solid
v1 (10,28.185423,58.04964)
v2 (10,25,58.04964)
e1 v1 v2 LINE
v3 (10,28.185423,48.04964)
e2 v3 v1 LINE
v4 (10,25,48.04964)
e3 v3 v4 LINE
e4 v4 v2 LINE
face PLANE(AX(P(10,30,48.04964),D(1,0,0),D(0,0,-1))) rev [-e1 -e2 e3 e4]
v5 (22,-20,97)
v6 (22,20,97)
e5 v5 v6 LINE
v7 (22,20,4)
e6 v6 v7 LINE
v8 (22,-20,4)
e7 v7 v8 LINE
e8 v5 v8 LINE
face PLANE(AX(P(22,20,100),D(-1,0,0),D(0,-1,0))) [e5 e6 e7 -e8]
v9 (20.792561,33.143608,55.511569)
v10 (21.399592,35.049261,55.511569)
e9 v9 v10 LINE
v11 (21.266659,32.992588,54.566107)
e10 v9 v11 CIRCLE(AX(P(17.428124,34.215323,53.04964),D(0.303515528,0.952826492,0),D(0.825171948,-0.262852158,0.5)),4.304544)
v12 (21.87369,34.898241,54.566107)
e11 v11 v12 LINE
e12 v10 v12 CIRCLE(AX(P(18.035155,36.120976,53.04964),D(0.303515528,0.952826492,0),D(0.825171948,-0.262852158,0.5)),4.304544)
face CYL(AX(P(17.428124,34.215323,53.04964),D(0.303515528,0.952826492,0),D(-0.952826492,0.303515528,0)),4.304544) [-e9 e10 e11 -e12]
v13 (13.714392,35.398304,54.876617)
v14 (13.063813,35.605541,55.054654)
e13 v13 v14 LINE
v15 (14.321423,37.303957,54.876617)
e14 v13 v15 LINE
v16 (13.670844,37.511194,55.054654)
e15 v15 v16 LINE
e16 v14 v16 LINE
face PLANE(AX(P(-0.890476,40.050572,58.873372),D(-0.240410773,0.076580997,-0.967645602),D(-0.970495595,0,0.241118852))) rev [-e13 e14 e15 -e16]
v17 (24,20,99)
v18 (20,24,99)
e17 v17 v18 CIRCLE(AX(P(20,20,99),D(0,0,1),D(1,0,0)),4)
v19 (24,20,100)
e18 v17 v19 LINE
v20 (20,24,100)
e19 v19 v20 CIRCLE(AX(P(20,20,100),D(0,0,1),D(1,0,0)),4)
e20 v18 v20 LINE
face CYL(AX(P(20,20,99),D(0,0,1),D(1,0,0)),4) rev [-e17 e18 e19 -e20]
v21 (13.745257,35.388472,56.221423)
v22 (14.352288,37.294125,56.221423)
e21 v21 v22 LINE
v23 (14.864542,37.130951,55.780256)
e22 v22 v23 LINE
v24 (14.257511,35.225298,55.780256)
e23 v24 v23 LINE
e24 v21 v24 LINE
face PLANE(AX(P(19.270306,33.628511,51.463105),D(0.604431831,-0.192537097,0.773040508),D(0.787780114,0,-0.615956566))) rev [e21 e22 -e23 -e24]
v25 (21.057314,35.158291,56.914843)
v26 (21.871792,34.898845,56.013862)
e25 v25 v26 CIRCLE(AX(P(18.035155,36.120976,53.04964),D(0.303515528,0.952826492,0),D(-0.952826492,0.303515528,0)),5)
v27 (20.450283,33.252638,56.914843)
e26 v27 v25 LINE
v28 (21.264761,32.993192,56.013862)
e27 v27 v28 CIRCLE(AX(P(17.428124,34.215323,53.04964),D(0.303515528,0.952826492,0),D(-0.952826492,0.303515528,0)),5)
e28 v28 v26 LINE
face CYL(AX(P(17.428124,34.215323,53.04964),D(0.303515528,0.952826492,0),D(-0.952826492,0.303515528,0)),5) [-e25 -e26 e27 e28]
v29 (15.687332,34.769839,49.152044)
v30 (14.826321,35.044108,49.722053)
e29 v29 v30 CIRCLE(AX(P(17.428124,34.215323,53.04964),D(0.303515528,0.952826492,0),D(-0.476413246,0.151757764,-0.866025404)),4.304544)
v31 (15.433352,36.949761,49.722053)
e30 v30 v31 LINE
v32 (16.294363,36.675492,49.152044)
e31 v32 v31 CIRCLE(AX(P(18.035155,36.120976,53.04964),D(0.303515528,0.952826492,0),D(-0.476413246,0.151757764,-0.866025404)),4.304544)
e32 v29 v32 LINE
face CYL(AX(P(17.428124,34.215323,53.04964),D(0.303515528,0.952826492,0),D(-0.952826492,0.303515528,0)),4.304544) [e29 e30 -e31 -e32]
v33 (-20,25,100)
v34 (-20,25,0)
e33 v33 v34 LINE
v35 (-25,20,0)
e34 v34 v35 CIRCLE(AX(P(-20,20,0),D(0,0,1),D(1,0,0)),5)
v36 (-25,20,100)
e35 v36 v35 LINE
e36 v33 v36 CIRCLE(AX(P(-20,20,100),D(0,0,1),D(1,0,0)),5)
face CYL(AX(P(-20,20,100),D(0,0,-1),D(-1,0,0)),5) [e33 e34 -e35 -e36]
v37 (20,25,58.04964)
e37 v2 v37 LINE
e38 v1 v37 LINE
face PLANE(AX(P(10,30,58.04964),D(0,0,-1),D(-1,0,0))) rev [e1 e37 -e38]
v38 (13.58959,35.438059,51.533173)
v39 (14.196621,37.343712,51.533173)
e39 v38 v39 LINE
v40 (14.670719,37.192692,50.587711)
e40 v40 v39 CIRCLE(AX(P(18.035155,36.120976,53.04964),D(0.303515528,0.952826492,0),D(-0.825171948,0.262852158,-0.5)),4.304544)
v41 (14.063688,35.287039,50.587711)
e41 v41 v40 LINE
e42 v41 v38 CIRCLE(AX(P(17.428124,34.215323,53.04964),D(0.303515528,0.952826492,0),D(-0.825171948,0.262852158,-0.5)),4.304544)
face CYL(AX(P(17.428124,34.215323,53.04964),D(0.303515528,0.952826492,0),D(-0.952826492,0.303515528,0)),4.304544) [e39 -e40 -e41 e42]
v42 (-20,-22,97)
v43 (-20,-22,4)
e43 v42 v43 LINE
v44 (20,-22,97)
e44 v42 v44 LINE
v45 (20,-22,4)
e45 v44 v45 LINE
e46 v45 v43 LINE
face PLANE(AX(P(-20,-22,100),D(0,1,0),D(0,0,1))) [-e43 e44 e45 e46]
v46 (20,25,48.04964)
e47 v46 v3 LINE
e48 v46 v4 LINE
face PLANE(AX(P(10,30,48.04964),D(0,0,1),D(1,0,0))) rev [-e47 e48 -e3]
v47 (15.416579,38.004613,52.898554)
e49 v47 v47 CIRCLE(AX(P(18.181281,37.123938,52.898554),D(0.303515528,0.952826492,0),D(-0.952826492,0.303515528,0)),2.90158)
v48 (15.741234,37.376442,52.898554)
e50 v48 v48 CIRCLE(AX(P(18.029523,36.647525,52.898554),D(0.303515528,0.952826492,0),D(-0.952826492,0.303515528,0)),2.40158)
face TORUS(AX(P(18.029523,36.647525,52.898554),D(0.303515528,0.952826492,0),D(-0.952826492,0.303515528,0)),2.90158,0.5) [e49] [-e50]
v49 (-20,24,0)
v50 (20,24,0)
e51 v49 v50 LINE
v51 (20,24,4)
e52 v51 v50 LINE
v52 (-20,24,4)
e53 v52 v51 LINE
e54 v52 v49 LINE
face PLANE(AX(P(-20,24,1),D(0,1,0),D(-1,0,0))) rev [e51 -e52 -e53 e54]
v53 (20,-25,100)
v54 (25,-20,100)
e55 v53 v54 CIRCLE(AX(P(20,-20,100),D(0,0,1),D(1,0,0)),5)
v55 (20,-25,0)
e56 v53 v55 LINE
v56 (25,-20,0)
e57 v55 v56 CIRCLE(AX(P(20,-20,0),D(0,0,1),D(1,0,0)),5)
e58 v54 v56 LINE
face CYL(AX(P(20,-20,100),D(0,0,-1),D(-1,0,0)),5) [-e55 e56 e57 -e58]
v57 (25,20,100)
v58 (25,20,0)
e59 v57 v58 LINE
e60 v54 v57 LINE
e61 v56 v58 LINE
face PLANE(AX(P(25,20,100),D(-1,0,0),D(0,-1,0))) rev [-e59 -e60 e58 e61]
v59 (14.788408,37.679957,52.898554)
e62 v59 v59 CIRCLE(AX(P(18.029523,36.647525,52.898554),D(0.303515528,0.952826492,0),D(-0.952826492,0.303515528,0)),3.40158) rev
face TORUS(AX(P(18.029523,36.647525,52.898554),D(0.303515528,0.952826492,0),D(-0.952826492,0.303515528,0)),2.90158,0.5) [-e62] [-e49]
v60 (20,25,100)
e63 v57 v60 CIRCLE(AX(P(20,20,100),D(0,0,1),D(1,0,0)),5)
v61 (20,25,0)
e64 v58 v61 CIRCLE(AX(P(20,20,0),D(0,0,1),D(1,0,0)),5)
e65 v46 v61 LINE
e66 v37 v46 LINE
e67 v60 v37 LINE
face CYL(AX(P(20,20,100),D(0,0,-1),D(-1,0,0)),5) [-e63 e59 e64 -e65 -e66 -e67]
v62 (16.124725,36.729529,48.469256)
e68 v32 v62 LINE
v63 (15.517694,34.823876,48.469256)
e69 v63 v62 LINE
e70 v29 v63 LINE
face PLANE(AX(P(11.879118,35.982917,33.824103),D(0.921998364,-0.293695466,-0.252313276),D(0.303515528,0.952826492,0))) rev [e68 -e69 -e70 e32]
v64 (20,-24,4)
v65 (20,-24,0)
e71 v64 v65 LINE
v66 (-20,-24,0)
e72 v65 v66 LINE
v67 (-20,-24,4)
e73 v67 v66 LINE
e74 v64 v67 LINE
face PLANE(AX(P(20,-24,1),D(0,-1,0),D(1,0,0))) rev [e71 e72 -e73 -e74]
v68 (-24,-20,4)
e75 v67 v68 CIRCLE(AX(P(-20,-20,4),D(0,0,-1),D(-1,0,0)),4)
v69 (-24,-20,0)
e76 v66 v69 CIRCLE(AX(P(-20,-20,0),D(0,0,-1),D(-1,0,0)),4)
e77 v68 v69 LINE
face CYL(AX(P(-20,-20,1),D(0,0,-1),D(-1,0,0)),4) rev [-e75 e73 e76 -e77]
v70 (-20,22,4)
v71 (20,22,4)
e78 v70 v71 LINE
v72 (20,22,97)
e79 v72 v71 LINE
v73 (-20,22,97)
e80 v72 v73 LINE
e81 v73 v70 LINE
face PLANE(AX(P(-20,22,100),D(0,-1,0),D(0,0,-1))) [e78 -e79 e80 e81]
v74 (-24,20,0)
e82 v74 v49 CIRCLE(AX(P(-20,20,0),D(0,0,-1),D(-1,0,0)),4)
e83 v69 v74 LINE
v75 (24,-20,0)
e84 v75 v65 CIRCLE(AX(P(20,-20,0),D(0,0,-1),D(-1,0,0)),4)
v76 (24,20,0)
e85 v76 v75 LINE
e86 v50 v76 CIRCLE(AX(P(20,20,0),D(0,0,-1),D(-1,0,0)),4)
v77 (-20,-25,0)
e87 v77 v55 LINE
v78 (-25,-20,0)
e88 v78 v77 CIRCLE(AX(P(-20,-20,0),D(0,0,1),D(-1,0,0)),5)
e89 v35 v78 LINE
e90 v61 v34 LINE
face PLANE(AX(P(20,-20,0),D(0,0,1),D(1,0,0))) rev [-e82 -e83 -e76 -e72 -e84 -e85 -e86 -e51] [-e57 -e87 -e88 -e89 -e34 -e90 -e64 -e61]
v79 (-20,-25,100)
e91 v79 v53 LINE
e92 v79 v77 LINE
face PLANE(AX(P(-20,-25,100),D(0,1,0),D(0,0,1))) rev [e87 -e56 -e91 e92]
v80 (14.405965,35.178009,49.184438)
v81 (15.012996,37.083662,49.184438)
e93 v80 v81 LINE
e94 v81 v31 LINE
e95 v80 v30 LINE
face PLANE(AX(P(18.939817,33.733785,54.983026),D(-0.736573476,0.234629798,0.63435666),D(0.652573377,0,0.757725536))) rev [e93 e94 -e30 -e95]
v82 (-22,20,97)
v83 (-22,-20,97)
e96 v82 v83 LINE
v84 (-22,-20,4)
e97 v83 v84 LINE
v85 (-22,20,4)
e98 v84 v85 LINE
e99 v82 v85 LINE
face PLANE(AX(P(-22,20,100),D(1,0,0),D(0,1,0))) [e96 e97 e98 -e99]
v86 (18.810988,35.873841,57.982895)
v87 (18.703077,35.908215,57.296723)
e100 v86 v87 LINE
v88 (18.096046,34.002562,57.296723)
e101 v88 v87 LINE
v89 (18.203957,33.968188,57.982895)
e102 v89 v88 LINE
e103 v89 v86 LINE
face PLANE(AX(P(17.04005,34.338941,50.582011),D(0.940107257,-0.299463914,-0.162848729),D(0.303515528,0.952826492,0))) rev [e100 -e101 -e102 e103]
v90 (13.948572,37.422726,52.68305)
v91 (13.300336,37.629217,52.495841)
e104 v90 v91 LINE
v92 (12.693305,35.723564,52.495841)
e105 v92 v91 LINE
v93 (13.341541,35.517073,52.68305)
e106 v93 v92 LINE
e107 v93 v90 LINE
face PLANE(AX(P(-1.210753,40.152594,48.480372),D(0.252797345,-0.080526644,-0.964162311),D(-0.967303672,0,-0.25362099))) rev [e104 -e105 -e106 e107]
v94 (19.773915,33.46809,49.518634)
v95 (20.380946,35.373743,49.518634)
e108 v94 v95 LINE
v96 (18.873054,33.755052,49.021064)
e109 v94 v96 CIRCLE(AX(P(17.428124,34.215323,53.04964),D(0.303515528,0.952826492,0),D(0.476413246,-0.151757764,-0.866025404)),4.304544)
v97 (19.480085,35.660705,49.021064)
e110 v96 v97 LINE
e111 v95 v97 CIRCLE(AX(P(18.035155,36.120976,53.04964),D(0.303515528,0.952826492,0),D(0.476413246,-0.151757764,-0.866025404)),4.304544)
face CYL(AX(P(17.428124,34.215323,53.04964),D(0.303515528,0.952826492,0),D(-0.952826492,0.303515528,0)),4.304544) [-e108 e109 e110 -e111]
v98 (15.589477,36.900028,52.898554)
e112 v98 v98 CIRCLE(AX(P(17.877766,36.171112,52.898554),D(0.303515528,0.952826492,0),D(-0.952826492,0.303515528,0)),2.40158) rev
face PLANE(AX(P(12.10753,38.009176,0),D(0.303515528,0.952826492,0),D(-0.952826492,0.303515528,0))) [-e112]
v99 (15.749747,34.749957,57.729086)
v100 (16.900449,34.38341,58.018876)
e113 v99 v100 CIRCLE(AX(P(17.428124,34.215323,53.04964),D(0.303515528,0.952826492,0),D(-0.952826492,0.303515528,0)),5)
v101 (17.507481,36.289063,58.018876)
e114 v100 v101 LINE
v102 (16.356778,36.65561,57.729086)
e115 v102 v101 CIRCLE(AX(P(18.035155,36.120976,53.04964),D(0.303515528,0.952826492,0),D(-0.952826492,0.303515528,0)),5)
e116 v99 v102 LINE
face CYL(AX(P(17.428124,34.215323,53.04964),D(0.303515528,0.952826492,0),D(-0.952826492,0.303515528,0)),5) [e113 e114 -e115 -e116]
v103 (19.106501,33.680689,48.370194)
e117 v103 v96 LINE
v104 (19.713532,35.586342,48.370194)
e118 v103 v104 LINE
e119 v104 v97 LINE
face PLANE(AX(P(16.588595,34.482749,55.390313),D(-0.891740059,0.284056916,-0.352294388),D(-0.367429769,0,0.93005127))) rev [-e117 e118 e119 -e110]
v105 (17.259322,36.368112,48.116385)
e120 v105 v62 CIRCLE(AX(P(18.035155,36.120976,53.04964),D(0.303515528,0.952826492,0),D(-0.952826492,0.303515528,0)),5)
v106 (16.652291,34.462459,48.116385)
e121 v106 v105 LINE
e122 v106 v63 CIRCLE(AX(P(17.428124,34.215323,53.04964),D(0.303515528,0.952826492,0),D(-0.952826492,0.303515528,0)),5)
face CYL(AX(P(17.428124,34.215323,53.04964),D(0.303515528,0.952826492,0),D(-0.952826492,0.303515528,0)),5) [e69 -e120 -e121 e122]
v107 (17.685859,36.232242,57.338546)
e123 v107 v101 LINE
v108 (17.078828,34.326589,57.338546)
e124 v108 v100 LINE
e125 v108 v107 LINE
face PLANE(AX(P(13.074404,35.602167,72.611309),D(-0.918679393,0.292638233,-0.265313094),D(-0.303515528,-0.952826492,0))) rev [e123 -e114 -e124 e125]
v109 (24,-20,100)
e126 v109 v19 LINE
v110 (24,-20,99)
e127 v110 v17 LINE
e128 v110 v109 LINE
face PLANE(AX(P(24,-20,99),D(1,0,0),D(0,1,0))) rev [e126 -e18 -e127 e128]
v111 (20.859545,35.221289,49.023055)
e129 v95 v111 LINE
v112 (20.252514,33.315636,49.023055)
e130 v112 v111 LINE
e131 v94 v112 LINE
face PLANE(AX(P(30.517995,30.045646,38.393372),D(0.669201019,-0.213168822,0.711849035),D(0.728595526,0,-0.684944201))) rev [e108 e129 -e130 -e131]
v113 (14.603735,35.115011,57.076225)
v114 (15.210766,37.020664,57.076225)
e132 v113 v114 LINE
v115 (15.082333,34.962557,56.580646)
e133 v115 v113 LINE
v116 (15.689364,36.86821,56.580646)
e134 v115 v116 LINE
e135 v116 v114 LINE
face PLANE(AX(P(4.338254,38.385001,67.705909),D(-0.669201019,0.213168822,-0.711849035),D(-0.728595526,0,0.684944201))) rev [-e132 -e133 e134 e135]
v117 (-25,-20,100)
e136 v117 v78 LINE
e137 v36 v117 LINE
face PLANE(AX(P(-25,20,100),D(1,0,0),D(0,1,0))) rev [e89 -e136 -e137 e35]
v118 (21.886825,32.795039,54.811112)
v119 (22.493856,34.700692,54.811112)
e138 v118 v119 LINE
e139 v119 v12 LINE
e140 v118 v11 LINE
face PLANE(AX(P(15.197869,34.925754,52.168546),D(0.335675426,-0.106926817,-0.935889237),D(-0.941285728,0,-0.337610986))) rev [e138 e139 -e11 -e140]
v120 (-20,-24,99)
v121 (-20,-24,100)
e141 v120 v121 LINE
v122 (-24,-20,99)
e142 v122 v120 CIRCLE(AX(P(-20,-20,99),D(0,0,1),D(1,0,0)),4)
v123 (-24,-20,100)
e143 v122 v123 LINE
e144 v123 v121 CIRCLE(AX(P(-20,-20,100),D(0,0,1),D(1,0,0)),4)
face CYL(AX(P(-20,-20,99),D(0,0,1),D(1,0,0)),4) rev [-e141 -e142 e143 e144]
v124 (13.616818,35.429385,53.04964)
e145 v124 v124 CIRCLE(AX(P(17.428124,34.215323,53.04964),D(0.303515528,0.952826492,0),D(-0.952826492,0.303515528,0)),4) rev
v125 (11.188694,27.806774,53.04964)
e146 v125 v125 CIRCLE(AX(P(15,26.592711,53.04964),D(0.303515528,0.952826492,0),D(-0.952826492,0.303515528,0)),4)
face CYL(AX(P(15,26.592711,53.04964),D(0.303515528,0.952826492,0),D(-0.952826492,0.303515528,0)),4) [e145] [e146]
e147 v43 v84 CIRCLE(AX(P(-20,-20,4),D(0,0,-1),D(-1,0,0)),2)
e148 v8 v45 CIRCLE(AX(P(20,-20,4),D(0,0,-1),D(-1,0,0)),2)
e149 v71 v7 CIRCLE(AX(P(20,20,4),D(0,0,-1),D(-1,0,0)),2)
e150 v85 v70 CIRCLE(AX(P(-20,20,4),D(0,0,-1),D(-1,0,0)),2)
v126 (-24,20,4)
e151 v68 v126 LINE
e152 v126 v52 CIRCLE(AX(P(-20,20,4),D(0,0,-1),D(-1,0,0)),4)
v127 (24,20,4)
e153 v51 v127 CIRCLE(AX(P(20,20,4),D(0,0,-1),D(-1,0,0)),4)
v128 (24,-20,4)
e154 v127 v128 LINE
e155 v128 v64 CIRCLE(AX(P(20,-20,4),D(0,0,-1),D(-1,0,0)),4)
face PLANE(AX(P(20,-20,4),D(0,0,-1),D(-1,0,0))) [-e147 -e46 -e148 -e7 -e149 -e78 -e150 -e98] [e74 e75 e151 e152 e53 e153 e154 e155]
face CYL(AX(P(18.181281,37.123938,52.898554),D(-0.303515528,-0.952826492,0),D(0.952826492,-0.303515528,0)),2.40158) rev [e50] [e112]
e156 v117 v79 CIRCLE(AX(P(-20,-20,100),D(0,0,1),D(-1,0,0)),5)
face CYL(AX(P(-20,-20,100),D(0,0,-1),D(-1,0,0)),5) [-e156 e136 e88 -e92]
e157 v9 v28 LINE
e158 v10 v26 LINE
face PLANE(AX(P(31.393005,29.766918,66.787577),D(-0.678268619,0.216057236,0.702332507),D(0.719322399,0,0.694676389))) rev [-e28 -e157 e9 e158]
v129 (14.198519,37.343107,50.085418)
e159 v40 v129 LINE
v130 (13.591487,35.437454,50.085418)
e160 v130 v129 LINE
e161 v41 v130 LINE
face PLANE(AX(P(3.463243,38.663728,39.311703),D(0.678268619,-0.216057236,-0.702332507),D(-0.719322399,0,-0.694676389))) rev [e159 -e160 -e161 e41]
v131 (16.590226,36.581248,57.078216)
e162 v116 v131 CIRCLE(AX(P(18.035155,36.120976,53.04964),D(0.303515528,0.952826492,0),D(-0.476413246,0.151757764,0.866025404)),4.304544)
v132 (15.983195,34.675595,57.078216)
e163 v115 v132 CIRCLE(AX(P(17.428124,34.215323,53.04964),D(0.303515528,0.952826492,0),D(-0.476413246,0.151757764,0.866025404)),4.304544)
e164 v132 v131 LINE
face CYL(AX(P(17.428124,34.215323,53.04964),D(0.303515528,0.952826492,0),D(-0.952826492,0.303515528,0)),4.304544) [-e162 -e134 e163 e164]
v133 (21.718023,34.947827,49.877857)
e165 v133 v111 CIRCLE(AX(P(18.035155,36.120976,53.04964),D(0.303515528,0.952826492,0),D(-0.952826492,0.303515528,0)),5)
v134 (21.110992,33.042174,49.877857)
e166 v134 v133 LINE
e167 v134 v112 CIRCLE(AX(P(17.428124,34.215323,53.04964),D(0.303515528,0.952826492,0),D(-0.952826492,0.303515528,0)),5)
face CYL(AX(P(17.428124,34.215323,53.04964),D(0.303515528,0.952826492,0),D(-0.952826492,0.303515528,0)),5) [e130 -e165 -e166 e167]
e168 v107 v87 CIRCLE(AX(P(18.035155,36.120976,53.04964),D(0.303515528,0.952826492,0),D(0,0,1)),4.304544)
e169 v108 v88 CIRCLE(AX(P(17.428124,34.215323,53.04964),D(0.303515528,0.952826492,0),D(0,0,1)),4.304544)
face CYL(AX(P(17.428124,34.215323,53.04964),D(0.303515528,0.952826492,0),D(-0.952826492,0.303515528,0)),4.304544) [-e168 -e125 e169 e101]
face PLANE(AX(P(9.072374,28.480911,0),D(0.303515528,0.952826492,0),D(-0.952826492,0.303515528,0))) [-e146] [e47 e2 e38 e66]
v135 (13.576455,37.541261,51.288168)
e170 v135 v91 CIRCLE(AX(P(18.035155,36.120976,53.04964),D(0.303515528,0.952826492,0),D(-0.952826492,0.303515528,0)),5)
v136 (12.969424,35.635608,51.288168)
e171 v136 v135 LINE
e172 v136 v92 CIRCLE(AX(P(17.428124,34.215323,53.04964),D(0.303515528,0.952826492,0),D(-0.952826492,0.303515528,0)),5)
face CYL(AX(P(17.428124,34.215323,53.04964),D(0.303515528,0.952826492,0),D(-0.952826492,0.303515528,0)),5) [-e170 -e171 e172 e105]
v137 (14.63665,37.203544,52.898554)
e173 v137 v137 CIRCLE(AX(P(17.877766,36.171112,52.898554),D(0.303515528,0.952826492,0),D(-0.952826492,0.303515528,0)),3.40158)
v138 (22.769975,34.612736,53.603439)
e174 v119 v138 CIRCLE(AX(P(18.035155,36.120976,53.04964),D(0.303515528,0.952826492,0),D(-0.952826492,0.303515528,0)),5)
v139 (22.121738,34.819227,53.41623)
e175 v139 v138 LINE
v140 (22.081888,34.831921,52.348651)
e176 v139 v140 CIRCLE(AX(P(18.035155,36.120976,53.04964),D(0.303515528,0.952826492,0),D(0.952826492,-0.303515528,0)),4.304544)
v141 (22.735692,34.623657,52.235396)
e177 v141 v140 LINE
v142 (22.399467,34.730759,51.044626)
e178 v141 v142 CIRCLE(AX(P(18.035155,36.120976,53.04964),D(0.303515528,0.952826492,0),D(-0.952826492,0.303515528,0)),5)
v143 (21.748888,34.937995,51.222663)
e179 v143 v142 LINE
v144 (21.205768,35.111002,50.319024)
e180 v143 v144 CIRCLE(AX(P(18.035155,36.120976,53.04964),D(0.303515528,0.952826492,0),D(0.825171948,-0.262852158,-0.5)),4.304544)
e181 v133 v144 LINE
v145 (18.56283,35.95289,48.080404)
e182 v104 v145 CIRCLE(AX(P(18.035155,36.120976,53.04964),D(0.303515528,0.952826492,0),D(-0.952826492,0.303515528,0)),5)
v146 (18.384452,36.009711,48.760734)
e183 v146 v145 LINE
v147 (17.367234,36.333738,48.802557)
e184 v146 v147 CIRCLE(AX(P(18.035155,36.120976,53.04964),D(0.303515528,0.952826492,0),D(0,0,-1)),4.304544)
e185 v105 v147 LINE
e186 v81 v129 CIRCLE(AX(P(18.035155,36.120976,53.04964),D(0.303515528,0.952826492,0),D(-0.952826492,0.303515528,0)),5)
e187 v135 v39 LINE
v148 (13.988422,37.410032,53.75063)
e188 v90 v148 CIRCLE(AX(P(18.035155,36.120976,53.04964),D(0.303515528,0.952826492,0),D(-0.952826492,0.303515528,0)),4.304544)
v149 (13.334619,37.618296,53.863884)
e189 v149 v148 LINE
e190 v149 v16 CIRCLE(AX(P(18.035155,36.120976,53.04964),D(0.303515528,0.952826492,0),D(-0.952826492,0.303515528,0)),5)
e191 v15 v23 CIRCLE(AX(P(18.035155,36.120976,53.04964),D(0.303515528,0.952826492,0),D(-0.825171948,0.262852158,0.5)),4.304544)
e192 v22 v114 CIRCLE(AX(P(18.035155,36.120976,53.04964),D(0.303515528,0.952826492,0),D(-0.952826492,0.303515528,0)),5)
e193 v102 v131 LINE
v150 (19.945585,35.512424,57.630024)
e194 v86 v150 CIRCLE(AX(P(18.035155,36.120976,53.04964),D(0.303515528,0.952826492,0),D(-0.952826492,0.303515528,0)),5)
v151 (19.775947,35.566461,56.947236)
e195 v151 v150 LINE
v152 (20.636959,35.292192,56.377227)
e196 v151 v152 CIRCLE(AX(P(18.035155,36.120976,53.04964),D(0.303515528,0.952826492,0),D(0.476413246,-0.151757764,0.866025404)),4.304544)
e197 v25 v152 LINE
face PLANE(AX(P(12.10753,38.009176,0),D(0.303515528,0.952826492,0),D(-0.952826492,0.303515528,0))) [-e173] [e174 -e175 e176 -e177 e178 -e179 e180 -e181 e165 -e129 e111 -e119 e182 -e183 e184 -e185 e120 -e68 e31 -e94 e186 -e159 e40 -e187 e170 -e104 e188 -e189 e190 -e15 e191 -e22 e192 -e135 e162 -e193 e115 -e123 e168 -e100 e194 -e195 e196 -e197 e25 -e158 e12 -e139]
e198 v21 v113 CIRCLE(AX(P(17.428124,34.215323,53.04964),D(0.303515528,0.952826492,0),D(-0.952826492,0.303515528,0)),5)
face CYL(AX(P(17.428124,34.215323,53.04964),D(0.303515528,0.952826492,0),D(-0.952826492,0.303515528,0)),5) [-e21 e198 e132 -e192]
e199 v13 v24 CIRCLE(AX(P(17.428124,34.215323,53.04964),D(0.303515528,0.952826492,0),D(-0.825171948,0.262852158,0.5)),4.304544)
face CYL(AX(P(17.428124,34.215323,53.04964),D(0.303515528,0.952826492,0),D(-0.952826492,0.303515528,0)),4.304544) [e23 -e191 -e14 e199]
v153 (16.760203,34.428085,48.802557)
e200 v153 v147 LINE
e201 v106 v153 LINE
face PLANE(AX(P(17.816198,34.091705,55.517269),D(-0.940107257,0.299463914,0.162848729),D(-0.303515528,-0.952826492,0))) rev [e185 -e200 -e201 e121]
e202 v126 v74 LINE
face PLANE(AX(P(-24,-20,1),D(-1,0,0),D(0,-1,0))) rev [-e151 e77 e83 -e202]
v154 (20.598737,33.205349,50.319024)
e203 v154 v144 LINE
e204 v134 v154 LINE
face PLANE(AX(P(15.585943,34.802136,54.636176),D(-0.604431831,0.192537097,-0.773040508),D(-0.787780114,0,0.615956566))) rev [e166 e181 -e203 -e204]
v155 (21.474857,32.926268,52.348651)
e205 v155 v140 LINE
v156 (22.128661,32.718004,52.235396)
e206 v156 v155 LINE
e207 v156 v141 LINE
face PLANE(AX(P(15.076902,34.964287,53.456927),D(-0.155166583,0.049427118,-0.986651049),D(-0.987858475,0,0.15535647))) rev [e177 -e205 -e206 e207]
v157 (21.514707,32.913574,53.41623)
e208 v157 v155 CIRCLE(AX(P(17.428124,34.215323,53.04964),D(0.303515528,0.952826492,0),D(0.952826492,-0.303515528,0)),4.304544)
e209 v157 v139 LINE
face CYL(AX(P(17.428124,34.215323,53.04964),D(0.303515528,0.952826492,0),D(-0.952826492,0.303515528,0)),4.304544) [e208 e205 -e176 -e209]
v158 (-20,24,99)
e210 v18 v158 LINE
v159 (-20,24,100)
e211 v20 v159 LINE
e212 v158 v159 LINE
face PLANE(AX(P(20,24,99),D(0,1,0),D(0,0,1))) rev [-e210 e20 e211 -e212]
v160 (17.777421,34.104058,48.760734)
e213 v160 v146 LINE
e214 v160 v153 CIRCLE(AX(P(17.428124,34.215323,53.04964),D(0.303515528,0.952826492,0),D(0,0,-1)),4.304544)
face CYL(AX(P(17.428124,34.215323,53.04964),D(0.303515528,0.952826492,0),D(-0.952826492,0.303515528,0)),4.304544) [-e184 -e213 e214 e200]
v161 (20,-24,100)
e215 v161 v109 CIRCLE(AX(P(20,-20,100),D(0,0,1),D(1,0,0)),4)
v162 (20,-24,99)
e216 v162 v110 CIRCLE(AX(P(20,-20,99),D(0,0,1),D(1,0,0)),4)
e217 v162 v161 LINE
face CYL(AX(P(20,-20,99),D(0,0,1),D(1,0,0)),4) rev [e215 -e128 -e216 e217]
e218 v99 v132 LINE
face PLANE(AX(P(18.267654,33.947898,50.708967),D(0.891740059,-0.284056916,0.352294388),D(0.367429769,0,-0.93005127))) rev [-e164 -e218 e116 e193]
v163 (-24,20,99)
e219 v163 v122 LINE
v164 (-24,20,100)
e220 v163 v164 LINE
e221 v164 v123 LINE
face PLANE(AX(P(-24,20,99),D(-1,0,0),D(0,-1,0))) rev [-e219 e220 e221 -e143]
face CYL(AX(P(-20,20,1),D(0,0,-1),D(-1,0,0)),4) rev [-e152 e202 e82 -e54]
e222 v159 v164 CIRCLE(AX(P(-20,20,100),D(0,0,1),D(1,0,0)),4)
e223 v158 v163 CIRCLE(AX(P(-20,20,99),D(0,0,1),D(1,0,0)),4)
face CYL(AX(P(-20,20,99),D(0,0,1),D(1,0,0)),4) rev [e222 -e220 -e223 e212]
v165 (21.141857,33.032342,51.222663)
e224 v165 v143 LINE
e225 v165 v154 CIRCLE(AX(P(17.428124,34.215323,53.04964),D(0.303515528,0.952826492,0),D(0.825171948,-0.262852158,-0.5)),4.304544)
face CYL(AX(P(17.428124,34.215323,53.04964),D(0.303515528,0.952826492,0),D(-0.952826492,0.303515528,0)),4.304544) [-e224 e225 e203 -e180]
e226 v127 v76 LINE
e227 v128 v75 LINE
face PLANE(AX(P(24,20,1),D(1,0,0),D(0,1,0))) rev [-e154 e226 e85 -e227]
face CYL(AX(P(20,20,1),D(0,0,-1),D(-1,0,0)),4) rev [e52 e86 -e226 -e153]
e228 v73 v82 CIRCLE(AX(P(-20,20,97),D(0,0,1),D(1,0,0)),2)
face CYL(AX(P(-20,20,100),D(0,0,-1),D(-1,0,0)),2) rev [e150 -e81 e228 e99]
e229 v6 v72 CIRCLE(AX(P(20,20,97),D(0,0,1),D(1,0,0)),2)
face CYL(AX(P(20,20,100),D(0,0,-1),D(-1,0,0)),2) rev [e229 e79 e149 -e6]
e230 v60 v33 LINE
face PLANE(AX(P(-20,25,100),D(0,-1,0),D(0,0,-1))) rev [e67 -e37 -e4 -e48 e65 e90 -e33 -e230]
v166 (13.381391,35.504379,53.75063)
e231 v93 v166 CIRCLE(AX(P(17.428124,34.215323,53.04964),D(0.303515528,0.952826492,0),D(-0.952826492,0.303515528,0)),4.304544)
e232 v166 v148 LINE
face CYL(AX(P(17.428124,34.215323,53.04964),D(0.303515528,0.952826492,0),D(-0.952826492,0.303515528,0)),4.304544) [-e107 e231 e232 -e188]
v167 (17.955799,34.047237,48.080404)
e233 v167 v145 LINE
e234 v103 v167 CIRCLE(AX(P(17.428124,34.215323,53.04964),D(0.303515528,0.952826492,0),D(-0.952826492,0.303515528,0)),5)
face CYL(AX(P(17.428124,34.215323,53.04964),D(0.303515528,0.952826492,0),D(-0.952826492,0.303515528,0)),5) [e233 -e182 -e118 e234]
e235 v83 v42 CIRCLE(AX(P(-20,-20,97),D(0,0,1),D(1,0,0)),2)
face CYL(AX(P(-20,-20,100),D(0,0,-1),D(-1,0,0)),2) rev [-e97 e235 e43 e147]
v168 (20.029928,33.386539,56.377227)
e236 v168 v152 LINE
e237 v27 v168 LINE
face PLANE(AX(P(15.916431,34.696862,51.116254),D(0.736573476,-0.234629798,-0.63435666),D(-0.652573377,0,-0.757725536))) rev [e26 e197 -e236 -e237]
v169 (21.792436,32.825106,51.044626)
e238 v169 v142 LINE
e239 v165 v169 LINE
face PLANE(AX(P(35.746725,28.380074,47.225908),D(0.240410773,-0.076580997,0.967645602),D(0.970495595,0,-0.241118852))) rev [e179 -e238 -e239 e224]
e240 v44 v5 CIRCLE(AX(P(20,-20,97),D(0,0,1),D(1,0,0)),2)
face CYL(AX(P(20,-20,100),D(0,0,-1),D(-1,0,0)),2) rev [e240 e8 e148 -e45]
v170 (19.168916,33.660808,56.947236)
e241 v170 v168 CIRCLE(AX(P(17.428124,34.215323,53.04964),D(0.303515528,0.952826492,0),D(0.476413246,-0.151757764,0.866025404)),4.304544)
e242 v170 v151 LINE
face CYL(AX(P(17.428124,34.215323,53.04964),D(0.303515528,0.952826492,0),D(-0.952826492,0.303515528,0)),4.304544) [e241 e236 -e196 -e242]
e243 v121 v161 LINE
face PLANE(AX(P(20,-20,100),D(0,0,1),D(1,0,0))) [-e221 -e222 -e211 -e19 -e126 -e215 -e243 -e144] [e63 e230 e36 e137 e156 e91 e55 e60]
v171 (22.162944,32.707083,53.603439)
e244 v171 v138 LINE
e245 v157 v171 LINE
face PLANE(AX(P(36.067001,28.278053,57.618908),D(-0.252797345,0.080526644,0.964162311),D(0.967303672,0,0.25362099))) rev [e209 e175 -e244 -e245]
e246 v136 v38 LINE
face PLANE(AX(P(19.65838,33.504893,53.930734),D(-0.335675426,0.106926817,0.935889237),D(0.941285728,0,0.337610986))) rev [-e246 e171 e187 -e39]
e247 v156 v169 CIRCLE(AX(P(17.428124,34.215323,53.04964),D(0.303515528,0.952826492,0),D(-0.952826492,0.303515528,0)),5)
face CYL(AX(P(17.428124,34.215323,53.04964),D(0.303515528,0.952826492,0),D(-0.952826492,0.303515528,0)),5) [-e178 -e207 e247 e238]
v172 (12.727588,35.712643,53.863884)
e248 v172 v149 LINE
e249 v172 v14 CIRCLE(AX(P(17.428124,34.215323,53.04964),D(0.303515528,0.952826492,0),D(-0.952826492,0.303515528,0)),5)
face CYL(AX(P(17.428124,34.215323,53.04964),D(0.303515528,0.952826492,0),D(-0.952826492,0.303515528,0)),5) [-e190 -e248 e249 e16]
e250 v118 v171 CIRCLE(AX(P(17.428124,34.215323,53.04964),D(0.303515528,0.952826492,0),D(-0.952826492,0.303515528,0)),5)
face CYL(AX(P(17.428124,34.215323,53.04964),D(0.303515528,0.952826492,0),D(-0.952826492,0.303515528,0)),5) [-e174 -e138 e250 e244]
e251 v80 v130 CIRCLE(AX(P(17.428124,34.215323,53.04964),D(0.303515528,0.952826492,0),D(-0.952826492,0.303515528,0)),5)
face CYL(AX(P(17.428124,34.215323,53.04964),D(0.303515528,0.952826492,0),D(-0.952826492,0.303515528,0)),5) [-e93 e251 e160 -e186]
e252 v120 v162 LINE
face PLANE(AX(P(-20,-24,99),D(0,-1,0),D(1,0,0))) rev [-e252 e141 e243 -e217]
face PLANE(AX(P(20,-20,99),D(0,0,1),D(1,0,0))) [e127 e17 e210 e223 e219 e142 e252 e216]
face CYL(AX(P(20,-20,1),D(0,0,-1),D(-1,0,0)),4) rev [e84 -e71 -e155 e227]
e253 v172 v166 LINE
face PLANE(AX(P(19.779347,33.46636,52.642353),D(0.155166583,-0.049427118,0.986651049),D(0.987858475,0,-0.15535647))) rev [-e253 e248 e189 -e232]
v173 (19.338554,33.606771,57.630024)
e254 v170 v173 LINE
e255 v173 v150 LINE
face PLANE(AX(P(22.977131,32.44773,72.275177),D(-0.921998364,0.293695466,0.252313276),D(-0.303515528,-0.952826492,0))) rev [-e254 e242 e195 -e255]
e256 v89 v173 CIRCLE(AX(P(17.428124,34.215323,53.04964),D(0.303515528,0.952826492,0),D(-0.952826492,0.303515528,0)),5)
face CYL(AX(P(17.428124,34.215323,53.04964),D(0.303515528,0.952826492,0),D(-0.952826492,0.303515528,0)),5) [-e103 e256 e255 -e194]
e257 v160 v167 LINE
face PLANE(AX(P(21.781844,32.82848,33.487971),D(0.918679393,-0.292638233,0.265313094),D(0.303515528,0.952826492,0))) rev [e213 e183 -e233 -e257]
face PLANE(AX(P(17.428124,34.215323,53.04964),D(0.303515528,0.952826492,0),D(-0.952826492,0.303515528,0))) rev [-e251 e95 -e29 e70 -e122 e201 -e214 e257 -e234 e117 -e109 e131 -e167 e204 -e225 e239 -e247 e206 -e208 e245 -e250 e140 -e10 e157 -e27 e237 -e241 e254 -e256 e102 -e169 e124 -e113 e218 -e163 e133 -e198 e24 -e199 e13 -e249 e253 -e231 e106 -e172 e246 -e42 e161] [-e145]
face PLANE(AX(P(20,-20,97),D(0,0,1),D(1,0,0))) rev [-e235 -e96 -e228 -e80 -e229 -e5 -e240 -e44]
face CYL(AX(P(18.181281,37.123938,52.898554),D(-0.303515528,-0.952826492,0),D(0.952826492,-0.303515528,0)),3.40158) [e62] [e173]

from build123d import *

# Parameters (mm, degrees)
BOSS_EXTRUDE1_DEPTH = 100
SHELL9_T            = -3
CUT_EXTRUDE1_DEPTH  = 1
CUT_EXTRUDE2_START  = -1
CUT_EXTRUDE2_DEPTH  = 1
SKETCH4_W           = 10
SKETCH4_H           = 10
BOSS_EXTRUDE2_DEPTH = 5
CUT_EXTRUDE5_DEPTH  = 10
SKETCH6_W           = 10.495090221
SKETCH6_H           = 10
BOSS_EXTRUDE3_DEPTH = 10
SKETCH7_W           = 10.495090221
SKETCH7_H           = 10
SKETCH7_R           = 4
CUT_EXTRUDE6_DEPTH  = 10
SKETCH8_R           = 5
BOSS_EXTRUDE4_DEPTH = 2
CUT_EXTRUDE7_DEPTH  = 2
CIRPATTERN1_COUNT   = 12
SKETCH10_R          = 3.401579871
SKETCH10_R_2        = 2.401579871
BOSS_EXTRUDE5_DEPTH = 1
FILLET2_R           = 0.5
FILLET3_R           = 0.5
CUT_EXTRUDE8_START  = -3
CUT_EXTRUDE8_DEPTH  = 3


with BuildPart() as part:
    # Sketch1 → Boss-Extrude1 (new body)
    with BuildSketch(Plane.XY):
        with BuildLine():
            Line((-20, 25), (20, 25))
            ThreePointArc((20, 25), (23.535533906, 23.535533906), (25, 20))
            Line((25, 20), (25, -20))
            ThreePointArc((25, -20), (23.535533906, -23.535533906), (20, -25))
            Line((20, -25), (-20, -25))
            ThreePointArc((-20, -25), (-23.535533906, -23.535533906), (-25, -20))
            Line((-25, -20), (-25, 20))
            ThreePointArc((-25, 20), (-23.535533906, 23.535533906), (-20, 25))
        make_face()
    extrude(amount=BOSS_EXTRUDE1_DEPTH)

    # Shell9
    shell9_openings = [part.faces().sort_by_distance(p)[0] for p in [
        (0, 0, 0),
    ]]
    offset(amount=SHELL9_T, openings=shell9_openings, kind=Kind.INTERSECTION)

    # Sketch2 → Cut-Extrude1 (cut)
    with BuildSketch(Plane.XY.offset(100)):
        with BuildLine():
            Line((24, -20), (24, 20))
            ThreePointArc((24, 20), (22.828427125, 22.828427125), (20, 24))
            Line((20, 24), (-20, 24))
            ThreePointArc((-20, 24), (-22.828427125, 22.828427125), (-24, 20))
            Line((-24, 20), (-24, -20))
            ThreePointArc((-24, -20), (-22.828427125, -22.828427125), (-20, -24))
            Line((-20, -24), (20, -24))
            ThreePointArc((20, -24), (22.828427125, -22.828427125), (24, -20))
        make_face()
    extrude(amount=-CUT_EXTRUDE1_DEPTH, mode=Mode.SUBTRACT)

    # Sketch3 → Cut-Extrude2 (cut)
    with BuildSketch(Plane(origin=(0, 0, 0), x_dir=(-1, 0, 0), z_dir=(0, 0, -1)).offset(CUT_EXTRUDE2_START)):
        with BuildLine():
            Line((-20, -24), (20, -24))
            ThreePointArc((20, -24), (22.828427125, -22.828427125), (24, -20))
            Line((24, -20), (24, 20))
            ThreePointArc((24, 20), (22.828427125, 22.828427125), (20, 24))
            Line((20, 24), (-20, 24))
            ThreePointArc((-20, 24), (-22.828427125, 22.828427125), (-24, 20))
            Line((-24, 20), (-24, -20))
            ThreePointArc((-24, -20), (-22.828427125, -22.828427125), (-20, -24))
        make_face()
    extrude(amount=CUT_EXTRUDE2_DEPTH, mode=Mode.SUBTRACT)

    # Sketch4 → Boss-Extrude2 (add)
    with BuildSketch(Plane(origin=(0, 25, 0), x_dir=(1, 0, 0), z_dir=(0, 1, 0))):
        with Locations((15, -53.049640043)):
            Rectangle(SKETCH4_W, SKETCH4_H)
    extrude(amount=BOSS_EXTRUDE2_DEPTH)

    # Sketch5 → Cut-Extrude5 (cut)
    with BuildSketch(Plane.XY.offset(58.049640043)):
        Polygon((10, 28.185422855), (20, 25), (20, 30), (10, 30), align=None)
    extrude(amount=-CUT_EXTRUDE5_DEPTH, mode=Mode.SUBTRACT)

    # Sketch6 → Boss-Extrude3 (add)
    with BuildSketch(Plane(origin=(9.072374427, 28.480910825, 0), x_dir=(0.9528264920711829, -0.3035155284451262, 0), z_dir=(0.3035155284451262, 0.9528264920711829, 0))):
        with Locations((6.22109652, -53.049640043)):
            Rectangle(SKETCH6_W, SKETCH6_H)
    extrude(amount=BOSS_EXTRUDE3_DEPTH)

    # Sketch7 → Cut-Extrude6 (cut)
    with BuildSketch(Plane(origin=(12.107529711, 38.009175746, 0), x_dir=(0.9528264920711829, -0.30351552844512614, 0), z_dir=(0.30351552844512614, 0.952826492071183, 0))):
        with Locations((6.22109652, -53.049640043)):
            Rectangle(SKETCH7_W, SKETCH7_H)
        with Locations(Location((6.221096519, -53.049640043, 0), (0, 0, 180))):
            Circle(SKETCH7_R, mode=Mode.SUBTRACT)
    extrude(amount=-CUT_EXTRUDE6_DEPTH, mode=Mode.SUBTRACT)

    # Sketch8 → Boss-Extrude4 (add)
    with BuildSketch(Plane(origin=(12.107529711, 38.009175746, 0), x_dir=(0.9528264920711829, -0.30351552844512614, 0), z_dir=(0.30351552844512614, 0.952826492071183, 0))):
        with Locations(Location((6.221096519, -53.049640043, 0), (0, 0, 180))):
            Circle(SKETCH8_R)
    extrude(amount=-BOSS_EXTRUDE4_DEPTH)

    # Sketch9 → Cut-Extrude7 (cut)
    with BuildSketch(Plane(origin=(12.107529711, 38.009175746, 0), x_dir=(0.9528264920711829, -0.30351552844512614, 0), z_dir=(0.30351552844512614, 0.952826492071183, 0))):
        with BuildLine():
            ThreePointArc((1.251860541, -52.495840627), (1.222824963, -53.18109898), (1.287841277, -53.863883686))
            Line((1.287841277, -53.863883686), (1.974013697, -53.750629555))
            ThreePointArc((1.974013697, -53.750629555), (1.919851851, -53.218142557), (1.932190971, -52.683050363))
            Line((1.932190971, -52.683050363), (1.251860541, -52.495840627))
        make_face()
    cut_extrude7 = extrude(amount=-CUT_EXTRUDE7_DEPTH, mode=Mode.SUBTRACT)

    # CirPattern1: Cut-Extrude7 ×12 about axis
    cirpattern1_axis = Axis((5.927625573, -1.888199398, 53.049640043), (0.30351552844512614, 0.9528264920711829, 0))
    for i in range(1, CIRPATTERN1_COUNT):
        add(cut_extrude7.rotate(cirpattern1_axis, i * 360 / CIRPATTERN1_COUNT), mode=Mode.SUBTRACT)

    # Sketch10 → Boss-Extrude5 (add)
    with BuildSketch(Plane(origin=(12.107529711, 38.009175746, 0), x_dir=(0.9528264920711829, -0.30351552844512614, 0), z_dir=(0.30351552844512614, 0.952826492071183, 0))):
        with Locations(Location((6.055914609, -52.898554166, 0), (0, 0, 180))):
            Circle(SKETCH10_R)
        with Locations(Location((6.055914609, -52.898554166, 0), (0, 0, 180))):
            Circle(SKETCH10_R_2, mode=Mode.SUBTRACT)
    extrude(amount=BOSS_EXTRUDE5_DEPTH)

    # Fillet2
    fillet2_edges = [part.edges().sort_by_distance(p)[0] for p in [
        (21.422396529, 36.091505803, 52.898554166),
    ]]
    fillet(fillet2_edges, radius=FILLET2_R)

    # Fillet3
    fillet3_edges = [part.edges().sort_by_distance(p)[0] for p in [
        (20.469570037, 36.395021331, 52.898554166),
    ]]
    fillet(fillet3_edges, radius=FILLET3_R - 0.0001)  # a hair under: the kernel refuses the full size

    # Sketch12 → Cut-Extrude8 (cut)
    with BuildSketch(Plane(origin=(0, 0, 1), x_dir=(-1, 0, 0), z_dir=(0, 0, -1)).offset(CUT_EXTRUDE8_START)):
        with BuildLine():
            Line((-20, -24), (20, -24))
            ThreePointArc((20, -24), (22.828427125, -22.828427125), (24, -20))
            Line((24, -20), (24, 20))
            ThreePointArc((24, 20), (22.828427125, 22.828427125), (20, 24))
            Line((20, 24), (-20, 24))
            ThreePointArc((-20, 24), (-22.828427125, 22.828427125), (-24, 20))
            Line((-24, 20), (-24, -20))
            ThreePointArc((-24, -20), (-22.828427125, -22.828427125), (-20, -24))
        make_face()
    extrude(amount=CUT_EXTRUDE8_DEPTH, mode=Mode.SUBTRACT)


solid = part.part
